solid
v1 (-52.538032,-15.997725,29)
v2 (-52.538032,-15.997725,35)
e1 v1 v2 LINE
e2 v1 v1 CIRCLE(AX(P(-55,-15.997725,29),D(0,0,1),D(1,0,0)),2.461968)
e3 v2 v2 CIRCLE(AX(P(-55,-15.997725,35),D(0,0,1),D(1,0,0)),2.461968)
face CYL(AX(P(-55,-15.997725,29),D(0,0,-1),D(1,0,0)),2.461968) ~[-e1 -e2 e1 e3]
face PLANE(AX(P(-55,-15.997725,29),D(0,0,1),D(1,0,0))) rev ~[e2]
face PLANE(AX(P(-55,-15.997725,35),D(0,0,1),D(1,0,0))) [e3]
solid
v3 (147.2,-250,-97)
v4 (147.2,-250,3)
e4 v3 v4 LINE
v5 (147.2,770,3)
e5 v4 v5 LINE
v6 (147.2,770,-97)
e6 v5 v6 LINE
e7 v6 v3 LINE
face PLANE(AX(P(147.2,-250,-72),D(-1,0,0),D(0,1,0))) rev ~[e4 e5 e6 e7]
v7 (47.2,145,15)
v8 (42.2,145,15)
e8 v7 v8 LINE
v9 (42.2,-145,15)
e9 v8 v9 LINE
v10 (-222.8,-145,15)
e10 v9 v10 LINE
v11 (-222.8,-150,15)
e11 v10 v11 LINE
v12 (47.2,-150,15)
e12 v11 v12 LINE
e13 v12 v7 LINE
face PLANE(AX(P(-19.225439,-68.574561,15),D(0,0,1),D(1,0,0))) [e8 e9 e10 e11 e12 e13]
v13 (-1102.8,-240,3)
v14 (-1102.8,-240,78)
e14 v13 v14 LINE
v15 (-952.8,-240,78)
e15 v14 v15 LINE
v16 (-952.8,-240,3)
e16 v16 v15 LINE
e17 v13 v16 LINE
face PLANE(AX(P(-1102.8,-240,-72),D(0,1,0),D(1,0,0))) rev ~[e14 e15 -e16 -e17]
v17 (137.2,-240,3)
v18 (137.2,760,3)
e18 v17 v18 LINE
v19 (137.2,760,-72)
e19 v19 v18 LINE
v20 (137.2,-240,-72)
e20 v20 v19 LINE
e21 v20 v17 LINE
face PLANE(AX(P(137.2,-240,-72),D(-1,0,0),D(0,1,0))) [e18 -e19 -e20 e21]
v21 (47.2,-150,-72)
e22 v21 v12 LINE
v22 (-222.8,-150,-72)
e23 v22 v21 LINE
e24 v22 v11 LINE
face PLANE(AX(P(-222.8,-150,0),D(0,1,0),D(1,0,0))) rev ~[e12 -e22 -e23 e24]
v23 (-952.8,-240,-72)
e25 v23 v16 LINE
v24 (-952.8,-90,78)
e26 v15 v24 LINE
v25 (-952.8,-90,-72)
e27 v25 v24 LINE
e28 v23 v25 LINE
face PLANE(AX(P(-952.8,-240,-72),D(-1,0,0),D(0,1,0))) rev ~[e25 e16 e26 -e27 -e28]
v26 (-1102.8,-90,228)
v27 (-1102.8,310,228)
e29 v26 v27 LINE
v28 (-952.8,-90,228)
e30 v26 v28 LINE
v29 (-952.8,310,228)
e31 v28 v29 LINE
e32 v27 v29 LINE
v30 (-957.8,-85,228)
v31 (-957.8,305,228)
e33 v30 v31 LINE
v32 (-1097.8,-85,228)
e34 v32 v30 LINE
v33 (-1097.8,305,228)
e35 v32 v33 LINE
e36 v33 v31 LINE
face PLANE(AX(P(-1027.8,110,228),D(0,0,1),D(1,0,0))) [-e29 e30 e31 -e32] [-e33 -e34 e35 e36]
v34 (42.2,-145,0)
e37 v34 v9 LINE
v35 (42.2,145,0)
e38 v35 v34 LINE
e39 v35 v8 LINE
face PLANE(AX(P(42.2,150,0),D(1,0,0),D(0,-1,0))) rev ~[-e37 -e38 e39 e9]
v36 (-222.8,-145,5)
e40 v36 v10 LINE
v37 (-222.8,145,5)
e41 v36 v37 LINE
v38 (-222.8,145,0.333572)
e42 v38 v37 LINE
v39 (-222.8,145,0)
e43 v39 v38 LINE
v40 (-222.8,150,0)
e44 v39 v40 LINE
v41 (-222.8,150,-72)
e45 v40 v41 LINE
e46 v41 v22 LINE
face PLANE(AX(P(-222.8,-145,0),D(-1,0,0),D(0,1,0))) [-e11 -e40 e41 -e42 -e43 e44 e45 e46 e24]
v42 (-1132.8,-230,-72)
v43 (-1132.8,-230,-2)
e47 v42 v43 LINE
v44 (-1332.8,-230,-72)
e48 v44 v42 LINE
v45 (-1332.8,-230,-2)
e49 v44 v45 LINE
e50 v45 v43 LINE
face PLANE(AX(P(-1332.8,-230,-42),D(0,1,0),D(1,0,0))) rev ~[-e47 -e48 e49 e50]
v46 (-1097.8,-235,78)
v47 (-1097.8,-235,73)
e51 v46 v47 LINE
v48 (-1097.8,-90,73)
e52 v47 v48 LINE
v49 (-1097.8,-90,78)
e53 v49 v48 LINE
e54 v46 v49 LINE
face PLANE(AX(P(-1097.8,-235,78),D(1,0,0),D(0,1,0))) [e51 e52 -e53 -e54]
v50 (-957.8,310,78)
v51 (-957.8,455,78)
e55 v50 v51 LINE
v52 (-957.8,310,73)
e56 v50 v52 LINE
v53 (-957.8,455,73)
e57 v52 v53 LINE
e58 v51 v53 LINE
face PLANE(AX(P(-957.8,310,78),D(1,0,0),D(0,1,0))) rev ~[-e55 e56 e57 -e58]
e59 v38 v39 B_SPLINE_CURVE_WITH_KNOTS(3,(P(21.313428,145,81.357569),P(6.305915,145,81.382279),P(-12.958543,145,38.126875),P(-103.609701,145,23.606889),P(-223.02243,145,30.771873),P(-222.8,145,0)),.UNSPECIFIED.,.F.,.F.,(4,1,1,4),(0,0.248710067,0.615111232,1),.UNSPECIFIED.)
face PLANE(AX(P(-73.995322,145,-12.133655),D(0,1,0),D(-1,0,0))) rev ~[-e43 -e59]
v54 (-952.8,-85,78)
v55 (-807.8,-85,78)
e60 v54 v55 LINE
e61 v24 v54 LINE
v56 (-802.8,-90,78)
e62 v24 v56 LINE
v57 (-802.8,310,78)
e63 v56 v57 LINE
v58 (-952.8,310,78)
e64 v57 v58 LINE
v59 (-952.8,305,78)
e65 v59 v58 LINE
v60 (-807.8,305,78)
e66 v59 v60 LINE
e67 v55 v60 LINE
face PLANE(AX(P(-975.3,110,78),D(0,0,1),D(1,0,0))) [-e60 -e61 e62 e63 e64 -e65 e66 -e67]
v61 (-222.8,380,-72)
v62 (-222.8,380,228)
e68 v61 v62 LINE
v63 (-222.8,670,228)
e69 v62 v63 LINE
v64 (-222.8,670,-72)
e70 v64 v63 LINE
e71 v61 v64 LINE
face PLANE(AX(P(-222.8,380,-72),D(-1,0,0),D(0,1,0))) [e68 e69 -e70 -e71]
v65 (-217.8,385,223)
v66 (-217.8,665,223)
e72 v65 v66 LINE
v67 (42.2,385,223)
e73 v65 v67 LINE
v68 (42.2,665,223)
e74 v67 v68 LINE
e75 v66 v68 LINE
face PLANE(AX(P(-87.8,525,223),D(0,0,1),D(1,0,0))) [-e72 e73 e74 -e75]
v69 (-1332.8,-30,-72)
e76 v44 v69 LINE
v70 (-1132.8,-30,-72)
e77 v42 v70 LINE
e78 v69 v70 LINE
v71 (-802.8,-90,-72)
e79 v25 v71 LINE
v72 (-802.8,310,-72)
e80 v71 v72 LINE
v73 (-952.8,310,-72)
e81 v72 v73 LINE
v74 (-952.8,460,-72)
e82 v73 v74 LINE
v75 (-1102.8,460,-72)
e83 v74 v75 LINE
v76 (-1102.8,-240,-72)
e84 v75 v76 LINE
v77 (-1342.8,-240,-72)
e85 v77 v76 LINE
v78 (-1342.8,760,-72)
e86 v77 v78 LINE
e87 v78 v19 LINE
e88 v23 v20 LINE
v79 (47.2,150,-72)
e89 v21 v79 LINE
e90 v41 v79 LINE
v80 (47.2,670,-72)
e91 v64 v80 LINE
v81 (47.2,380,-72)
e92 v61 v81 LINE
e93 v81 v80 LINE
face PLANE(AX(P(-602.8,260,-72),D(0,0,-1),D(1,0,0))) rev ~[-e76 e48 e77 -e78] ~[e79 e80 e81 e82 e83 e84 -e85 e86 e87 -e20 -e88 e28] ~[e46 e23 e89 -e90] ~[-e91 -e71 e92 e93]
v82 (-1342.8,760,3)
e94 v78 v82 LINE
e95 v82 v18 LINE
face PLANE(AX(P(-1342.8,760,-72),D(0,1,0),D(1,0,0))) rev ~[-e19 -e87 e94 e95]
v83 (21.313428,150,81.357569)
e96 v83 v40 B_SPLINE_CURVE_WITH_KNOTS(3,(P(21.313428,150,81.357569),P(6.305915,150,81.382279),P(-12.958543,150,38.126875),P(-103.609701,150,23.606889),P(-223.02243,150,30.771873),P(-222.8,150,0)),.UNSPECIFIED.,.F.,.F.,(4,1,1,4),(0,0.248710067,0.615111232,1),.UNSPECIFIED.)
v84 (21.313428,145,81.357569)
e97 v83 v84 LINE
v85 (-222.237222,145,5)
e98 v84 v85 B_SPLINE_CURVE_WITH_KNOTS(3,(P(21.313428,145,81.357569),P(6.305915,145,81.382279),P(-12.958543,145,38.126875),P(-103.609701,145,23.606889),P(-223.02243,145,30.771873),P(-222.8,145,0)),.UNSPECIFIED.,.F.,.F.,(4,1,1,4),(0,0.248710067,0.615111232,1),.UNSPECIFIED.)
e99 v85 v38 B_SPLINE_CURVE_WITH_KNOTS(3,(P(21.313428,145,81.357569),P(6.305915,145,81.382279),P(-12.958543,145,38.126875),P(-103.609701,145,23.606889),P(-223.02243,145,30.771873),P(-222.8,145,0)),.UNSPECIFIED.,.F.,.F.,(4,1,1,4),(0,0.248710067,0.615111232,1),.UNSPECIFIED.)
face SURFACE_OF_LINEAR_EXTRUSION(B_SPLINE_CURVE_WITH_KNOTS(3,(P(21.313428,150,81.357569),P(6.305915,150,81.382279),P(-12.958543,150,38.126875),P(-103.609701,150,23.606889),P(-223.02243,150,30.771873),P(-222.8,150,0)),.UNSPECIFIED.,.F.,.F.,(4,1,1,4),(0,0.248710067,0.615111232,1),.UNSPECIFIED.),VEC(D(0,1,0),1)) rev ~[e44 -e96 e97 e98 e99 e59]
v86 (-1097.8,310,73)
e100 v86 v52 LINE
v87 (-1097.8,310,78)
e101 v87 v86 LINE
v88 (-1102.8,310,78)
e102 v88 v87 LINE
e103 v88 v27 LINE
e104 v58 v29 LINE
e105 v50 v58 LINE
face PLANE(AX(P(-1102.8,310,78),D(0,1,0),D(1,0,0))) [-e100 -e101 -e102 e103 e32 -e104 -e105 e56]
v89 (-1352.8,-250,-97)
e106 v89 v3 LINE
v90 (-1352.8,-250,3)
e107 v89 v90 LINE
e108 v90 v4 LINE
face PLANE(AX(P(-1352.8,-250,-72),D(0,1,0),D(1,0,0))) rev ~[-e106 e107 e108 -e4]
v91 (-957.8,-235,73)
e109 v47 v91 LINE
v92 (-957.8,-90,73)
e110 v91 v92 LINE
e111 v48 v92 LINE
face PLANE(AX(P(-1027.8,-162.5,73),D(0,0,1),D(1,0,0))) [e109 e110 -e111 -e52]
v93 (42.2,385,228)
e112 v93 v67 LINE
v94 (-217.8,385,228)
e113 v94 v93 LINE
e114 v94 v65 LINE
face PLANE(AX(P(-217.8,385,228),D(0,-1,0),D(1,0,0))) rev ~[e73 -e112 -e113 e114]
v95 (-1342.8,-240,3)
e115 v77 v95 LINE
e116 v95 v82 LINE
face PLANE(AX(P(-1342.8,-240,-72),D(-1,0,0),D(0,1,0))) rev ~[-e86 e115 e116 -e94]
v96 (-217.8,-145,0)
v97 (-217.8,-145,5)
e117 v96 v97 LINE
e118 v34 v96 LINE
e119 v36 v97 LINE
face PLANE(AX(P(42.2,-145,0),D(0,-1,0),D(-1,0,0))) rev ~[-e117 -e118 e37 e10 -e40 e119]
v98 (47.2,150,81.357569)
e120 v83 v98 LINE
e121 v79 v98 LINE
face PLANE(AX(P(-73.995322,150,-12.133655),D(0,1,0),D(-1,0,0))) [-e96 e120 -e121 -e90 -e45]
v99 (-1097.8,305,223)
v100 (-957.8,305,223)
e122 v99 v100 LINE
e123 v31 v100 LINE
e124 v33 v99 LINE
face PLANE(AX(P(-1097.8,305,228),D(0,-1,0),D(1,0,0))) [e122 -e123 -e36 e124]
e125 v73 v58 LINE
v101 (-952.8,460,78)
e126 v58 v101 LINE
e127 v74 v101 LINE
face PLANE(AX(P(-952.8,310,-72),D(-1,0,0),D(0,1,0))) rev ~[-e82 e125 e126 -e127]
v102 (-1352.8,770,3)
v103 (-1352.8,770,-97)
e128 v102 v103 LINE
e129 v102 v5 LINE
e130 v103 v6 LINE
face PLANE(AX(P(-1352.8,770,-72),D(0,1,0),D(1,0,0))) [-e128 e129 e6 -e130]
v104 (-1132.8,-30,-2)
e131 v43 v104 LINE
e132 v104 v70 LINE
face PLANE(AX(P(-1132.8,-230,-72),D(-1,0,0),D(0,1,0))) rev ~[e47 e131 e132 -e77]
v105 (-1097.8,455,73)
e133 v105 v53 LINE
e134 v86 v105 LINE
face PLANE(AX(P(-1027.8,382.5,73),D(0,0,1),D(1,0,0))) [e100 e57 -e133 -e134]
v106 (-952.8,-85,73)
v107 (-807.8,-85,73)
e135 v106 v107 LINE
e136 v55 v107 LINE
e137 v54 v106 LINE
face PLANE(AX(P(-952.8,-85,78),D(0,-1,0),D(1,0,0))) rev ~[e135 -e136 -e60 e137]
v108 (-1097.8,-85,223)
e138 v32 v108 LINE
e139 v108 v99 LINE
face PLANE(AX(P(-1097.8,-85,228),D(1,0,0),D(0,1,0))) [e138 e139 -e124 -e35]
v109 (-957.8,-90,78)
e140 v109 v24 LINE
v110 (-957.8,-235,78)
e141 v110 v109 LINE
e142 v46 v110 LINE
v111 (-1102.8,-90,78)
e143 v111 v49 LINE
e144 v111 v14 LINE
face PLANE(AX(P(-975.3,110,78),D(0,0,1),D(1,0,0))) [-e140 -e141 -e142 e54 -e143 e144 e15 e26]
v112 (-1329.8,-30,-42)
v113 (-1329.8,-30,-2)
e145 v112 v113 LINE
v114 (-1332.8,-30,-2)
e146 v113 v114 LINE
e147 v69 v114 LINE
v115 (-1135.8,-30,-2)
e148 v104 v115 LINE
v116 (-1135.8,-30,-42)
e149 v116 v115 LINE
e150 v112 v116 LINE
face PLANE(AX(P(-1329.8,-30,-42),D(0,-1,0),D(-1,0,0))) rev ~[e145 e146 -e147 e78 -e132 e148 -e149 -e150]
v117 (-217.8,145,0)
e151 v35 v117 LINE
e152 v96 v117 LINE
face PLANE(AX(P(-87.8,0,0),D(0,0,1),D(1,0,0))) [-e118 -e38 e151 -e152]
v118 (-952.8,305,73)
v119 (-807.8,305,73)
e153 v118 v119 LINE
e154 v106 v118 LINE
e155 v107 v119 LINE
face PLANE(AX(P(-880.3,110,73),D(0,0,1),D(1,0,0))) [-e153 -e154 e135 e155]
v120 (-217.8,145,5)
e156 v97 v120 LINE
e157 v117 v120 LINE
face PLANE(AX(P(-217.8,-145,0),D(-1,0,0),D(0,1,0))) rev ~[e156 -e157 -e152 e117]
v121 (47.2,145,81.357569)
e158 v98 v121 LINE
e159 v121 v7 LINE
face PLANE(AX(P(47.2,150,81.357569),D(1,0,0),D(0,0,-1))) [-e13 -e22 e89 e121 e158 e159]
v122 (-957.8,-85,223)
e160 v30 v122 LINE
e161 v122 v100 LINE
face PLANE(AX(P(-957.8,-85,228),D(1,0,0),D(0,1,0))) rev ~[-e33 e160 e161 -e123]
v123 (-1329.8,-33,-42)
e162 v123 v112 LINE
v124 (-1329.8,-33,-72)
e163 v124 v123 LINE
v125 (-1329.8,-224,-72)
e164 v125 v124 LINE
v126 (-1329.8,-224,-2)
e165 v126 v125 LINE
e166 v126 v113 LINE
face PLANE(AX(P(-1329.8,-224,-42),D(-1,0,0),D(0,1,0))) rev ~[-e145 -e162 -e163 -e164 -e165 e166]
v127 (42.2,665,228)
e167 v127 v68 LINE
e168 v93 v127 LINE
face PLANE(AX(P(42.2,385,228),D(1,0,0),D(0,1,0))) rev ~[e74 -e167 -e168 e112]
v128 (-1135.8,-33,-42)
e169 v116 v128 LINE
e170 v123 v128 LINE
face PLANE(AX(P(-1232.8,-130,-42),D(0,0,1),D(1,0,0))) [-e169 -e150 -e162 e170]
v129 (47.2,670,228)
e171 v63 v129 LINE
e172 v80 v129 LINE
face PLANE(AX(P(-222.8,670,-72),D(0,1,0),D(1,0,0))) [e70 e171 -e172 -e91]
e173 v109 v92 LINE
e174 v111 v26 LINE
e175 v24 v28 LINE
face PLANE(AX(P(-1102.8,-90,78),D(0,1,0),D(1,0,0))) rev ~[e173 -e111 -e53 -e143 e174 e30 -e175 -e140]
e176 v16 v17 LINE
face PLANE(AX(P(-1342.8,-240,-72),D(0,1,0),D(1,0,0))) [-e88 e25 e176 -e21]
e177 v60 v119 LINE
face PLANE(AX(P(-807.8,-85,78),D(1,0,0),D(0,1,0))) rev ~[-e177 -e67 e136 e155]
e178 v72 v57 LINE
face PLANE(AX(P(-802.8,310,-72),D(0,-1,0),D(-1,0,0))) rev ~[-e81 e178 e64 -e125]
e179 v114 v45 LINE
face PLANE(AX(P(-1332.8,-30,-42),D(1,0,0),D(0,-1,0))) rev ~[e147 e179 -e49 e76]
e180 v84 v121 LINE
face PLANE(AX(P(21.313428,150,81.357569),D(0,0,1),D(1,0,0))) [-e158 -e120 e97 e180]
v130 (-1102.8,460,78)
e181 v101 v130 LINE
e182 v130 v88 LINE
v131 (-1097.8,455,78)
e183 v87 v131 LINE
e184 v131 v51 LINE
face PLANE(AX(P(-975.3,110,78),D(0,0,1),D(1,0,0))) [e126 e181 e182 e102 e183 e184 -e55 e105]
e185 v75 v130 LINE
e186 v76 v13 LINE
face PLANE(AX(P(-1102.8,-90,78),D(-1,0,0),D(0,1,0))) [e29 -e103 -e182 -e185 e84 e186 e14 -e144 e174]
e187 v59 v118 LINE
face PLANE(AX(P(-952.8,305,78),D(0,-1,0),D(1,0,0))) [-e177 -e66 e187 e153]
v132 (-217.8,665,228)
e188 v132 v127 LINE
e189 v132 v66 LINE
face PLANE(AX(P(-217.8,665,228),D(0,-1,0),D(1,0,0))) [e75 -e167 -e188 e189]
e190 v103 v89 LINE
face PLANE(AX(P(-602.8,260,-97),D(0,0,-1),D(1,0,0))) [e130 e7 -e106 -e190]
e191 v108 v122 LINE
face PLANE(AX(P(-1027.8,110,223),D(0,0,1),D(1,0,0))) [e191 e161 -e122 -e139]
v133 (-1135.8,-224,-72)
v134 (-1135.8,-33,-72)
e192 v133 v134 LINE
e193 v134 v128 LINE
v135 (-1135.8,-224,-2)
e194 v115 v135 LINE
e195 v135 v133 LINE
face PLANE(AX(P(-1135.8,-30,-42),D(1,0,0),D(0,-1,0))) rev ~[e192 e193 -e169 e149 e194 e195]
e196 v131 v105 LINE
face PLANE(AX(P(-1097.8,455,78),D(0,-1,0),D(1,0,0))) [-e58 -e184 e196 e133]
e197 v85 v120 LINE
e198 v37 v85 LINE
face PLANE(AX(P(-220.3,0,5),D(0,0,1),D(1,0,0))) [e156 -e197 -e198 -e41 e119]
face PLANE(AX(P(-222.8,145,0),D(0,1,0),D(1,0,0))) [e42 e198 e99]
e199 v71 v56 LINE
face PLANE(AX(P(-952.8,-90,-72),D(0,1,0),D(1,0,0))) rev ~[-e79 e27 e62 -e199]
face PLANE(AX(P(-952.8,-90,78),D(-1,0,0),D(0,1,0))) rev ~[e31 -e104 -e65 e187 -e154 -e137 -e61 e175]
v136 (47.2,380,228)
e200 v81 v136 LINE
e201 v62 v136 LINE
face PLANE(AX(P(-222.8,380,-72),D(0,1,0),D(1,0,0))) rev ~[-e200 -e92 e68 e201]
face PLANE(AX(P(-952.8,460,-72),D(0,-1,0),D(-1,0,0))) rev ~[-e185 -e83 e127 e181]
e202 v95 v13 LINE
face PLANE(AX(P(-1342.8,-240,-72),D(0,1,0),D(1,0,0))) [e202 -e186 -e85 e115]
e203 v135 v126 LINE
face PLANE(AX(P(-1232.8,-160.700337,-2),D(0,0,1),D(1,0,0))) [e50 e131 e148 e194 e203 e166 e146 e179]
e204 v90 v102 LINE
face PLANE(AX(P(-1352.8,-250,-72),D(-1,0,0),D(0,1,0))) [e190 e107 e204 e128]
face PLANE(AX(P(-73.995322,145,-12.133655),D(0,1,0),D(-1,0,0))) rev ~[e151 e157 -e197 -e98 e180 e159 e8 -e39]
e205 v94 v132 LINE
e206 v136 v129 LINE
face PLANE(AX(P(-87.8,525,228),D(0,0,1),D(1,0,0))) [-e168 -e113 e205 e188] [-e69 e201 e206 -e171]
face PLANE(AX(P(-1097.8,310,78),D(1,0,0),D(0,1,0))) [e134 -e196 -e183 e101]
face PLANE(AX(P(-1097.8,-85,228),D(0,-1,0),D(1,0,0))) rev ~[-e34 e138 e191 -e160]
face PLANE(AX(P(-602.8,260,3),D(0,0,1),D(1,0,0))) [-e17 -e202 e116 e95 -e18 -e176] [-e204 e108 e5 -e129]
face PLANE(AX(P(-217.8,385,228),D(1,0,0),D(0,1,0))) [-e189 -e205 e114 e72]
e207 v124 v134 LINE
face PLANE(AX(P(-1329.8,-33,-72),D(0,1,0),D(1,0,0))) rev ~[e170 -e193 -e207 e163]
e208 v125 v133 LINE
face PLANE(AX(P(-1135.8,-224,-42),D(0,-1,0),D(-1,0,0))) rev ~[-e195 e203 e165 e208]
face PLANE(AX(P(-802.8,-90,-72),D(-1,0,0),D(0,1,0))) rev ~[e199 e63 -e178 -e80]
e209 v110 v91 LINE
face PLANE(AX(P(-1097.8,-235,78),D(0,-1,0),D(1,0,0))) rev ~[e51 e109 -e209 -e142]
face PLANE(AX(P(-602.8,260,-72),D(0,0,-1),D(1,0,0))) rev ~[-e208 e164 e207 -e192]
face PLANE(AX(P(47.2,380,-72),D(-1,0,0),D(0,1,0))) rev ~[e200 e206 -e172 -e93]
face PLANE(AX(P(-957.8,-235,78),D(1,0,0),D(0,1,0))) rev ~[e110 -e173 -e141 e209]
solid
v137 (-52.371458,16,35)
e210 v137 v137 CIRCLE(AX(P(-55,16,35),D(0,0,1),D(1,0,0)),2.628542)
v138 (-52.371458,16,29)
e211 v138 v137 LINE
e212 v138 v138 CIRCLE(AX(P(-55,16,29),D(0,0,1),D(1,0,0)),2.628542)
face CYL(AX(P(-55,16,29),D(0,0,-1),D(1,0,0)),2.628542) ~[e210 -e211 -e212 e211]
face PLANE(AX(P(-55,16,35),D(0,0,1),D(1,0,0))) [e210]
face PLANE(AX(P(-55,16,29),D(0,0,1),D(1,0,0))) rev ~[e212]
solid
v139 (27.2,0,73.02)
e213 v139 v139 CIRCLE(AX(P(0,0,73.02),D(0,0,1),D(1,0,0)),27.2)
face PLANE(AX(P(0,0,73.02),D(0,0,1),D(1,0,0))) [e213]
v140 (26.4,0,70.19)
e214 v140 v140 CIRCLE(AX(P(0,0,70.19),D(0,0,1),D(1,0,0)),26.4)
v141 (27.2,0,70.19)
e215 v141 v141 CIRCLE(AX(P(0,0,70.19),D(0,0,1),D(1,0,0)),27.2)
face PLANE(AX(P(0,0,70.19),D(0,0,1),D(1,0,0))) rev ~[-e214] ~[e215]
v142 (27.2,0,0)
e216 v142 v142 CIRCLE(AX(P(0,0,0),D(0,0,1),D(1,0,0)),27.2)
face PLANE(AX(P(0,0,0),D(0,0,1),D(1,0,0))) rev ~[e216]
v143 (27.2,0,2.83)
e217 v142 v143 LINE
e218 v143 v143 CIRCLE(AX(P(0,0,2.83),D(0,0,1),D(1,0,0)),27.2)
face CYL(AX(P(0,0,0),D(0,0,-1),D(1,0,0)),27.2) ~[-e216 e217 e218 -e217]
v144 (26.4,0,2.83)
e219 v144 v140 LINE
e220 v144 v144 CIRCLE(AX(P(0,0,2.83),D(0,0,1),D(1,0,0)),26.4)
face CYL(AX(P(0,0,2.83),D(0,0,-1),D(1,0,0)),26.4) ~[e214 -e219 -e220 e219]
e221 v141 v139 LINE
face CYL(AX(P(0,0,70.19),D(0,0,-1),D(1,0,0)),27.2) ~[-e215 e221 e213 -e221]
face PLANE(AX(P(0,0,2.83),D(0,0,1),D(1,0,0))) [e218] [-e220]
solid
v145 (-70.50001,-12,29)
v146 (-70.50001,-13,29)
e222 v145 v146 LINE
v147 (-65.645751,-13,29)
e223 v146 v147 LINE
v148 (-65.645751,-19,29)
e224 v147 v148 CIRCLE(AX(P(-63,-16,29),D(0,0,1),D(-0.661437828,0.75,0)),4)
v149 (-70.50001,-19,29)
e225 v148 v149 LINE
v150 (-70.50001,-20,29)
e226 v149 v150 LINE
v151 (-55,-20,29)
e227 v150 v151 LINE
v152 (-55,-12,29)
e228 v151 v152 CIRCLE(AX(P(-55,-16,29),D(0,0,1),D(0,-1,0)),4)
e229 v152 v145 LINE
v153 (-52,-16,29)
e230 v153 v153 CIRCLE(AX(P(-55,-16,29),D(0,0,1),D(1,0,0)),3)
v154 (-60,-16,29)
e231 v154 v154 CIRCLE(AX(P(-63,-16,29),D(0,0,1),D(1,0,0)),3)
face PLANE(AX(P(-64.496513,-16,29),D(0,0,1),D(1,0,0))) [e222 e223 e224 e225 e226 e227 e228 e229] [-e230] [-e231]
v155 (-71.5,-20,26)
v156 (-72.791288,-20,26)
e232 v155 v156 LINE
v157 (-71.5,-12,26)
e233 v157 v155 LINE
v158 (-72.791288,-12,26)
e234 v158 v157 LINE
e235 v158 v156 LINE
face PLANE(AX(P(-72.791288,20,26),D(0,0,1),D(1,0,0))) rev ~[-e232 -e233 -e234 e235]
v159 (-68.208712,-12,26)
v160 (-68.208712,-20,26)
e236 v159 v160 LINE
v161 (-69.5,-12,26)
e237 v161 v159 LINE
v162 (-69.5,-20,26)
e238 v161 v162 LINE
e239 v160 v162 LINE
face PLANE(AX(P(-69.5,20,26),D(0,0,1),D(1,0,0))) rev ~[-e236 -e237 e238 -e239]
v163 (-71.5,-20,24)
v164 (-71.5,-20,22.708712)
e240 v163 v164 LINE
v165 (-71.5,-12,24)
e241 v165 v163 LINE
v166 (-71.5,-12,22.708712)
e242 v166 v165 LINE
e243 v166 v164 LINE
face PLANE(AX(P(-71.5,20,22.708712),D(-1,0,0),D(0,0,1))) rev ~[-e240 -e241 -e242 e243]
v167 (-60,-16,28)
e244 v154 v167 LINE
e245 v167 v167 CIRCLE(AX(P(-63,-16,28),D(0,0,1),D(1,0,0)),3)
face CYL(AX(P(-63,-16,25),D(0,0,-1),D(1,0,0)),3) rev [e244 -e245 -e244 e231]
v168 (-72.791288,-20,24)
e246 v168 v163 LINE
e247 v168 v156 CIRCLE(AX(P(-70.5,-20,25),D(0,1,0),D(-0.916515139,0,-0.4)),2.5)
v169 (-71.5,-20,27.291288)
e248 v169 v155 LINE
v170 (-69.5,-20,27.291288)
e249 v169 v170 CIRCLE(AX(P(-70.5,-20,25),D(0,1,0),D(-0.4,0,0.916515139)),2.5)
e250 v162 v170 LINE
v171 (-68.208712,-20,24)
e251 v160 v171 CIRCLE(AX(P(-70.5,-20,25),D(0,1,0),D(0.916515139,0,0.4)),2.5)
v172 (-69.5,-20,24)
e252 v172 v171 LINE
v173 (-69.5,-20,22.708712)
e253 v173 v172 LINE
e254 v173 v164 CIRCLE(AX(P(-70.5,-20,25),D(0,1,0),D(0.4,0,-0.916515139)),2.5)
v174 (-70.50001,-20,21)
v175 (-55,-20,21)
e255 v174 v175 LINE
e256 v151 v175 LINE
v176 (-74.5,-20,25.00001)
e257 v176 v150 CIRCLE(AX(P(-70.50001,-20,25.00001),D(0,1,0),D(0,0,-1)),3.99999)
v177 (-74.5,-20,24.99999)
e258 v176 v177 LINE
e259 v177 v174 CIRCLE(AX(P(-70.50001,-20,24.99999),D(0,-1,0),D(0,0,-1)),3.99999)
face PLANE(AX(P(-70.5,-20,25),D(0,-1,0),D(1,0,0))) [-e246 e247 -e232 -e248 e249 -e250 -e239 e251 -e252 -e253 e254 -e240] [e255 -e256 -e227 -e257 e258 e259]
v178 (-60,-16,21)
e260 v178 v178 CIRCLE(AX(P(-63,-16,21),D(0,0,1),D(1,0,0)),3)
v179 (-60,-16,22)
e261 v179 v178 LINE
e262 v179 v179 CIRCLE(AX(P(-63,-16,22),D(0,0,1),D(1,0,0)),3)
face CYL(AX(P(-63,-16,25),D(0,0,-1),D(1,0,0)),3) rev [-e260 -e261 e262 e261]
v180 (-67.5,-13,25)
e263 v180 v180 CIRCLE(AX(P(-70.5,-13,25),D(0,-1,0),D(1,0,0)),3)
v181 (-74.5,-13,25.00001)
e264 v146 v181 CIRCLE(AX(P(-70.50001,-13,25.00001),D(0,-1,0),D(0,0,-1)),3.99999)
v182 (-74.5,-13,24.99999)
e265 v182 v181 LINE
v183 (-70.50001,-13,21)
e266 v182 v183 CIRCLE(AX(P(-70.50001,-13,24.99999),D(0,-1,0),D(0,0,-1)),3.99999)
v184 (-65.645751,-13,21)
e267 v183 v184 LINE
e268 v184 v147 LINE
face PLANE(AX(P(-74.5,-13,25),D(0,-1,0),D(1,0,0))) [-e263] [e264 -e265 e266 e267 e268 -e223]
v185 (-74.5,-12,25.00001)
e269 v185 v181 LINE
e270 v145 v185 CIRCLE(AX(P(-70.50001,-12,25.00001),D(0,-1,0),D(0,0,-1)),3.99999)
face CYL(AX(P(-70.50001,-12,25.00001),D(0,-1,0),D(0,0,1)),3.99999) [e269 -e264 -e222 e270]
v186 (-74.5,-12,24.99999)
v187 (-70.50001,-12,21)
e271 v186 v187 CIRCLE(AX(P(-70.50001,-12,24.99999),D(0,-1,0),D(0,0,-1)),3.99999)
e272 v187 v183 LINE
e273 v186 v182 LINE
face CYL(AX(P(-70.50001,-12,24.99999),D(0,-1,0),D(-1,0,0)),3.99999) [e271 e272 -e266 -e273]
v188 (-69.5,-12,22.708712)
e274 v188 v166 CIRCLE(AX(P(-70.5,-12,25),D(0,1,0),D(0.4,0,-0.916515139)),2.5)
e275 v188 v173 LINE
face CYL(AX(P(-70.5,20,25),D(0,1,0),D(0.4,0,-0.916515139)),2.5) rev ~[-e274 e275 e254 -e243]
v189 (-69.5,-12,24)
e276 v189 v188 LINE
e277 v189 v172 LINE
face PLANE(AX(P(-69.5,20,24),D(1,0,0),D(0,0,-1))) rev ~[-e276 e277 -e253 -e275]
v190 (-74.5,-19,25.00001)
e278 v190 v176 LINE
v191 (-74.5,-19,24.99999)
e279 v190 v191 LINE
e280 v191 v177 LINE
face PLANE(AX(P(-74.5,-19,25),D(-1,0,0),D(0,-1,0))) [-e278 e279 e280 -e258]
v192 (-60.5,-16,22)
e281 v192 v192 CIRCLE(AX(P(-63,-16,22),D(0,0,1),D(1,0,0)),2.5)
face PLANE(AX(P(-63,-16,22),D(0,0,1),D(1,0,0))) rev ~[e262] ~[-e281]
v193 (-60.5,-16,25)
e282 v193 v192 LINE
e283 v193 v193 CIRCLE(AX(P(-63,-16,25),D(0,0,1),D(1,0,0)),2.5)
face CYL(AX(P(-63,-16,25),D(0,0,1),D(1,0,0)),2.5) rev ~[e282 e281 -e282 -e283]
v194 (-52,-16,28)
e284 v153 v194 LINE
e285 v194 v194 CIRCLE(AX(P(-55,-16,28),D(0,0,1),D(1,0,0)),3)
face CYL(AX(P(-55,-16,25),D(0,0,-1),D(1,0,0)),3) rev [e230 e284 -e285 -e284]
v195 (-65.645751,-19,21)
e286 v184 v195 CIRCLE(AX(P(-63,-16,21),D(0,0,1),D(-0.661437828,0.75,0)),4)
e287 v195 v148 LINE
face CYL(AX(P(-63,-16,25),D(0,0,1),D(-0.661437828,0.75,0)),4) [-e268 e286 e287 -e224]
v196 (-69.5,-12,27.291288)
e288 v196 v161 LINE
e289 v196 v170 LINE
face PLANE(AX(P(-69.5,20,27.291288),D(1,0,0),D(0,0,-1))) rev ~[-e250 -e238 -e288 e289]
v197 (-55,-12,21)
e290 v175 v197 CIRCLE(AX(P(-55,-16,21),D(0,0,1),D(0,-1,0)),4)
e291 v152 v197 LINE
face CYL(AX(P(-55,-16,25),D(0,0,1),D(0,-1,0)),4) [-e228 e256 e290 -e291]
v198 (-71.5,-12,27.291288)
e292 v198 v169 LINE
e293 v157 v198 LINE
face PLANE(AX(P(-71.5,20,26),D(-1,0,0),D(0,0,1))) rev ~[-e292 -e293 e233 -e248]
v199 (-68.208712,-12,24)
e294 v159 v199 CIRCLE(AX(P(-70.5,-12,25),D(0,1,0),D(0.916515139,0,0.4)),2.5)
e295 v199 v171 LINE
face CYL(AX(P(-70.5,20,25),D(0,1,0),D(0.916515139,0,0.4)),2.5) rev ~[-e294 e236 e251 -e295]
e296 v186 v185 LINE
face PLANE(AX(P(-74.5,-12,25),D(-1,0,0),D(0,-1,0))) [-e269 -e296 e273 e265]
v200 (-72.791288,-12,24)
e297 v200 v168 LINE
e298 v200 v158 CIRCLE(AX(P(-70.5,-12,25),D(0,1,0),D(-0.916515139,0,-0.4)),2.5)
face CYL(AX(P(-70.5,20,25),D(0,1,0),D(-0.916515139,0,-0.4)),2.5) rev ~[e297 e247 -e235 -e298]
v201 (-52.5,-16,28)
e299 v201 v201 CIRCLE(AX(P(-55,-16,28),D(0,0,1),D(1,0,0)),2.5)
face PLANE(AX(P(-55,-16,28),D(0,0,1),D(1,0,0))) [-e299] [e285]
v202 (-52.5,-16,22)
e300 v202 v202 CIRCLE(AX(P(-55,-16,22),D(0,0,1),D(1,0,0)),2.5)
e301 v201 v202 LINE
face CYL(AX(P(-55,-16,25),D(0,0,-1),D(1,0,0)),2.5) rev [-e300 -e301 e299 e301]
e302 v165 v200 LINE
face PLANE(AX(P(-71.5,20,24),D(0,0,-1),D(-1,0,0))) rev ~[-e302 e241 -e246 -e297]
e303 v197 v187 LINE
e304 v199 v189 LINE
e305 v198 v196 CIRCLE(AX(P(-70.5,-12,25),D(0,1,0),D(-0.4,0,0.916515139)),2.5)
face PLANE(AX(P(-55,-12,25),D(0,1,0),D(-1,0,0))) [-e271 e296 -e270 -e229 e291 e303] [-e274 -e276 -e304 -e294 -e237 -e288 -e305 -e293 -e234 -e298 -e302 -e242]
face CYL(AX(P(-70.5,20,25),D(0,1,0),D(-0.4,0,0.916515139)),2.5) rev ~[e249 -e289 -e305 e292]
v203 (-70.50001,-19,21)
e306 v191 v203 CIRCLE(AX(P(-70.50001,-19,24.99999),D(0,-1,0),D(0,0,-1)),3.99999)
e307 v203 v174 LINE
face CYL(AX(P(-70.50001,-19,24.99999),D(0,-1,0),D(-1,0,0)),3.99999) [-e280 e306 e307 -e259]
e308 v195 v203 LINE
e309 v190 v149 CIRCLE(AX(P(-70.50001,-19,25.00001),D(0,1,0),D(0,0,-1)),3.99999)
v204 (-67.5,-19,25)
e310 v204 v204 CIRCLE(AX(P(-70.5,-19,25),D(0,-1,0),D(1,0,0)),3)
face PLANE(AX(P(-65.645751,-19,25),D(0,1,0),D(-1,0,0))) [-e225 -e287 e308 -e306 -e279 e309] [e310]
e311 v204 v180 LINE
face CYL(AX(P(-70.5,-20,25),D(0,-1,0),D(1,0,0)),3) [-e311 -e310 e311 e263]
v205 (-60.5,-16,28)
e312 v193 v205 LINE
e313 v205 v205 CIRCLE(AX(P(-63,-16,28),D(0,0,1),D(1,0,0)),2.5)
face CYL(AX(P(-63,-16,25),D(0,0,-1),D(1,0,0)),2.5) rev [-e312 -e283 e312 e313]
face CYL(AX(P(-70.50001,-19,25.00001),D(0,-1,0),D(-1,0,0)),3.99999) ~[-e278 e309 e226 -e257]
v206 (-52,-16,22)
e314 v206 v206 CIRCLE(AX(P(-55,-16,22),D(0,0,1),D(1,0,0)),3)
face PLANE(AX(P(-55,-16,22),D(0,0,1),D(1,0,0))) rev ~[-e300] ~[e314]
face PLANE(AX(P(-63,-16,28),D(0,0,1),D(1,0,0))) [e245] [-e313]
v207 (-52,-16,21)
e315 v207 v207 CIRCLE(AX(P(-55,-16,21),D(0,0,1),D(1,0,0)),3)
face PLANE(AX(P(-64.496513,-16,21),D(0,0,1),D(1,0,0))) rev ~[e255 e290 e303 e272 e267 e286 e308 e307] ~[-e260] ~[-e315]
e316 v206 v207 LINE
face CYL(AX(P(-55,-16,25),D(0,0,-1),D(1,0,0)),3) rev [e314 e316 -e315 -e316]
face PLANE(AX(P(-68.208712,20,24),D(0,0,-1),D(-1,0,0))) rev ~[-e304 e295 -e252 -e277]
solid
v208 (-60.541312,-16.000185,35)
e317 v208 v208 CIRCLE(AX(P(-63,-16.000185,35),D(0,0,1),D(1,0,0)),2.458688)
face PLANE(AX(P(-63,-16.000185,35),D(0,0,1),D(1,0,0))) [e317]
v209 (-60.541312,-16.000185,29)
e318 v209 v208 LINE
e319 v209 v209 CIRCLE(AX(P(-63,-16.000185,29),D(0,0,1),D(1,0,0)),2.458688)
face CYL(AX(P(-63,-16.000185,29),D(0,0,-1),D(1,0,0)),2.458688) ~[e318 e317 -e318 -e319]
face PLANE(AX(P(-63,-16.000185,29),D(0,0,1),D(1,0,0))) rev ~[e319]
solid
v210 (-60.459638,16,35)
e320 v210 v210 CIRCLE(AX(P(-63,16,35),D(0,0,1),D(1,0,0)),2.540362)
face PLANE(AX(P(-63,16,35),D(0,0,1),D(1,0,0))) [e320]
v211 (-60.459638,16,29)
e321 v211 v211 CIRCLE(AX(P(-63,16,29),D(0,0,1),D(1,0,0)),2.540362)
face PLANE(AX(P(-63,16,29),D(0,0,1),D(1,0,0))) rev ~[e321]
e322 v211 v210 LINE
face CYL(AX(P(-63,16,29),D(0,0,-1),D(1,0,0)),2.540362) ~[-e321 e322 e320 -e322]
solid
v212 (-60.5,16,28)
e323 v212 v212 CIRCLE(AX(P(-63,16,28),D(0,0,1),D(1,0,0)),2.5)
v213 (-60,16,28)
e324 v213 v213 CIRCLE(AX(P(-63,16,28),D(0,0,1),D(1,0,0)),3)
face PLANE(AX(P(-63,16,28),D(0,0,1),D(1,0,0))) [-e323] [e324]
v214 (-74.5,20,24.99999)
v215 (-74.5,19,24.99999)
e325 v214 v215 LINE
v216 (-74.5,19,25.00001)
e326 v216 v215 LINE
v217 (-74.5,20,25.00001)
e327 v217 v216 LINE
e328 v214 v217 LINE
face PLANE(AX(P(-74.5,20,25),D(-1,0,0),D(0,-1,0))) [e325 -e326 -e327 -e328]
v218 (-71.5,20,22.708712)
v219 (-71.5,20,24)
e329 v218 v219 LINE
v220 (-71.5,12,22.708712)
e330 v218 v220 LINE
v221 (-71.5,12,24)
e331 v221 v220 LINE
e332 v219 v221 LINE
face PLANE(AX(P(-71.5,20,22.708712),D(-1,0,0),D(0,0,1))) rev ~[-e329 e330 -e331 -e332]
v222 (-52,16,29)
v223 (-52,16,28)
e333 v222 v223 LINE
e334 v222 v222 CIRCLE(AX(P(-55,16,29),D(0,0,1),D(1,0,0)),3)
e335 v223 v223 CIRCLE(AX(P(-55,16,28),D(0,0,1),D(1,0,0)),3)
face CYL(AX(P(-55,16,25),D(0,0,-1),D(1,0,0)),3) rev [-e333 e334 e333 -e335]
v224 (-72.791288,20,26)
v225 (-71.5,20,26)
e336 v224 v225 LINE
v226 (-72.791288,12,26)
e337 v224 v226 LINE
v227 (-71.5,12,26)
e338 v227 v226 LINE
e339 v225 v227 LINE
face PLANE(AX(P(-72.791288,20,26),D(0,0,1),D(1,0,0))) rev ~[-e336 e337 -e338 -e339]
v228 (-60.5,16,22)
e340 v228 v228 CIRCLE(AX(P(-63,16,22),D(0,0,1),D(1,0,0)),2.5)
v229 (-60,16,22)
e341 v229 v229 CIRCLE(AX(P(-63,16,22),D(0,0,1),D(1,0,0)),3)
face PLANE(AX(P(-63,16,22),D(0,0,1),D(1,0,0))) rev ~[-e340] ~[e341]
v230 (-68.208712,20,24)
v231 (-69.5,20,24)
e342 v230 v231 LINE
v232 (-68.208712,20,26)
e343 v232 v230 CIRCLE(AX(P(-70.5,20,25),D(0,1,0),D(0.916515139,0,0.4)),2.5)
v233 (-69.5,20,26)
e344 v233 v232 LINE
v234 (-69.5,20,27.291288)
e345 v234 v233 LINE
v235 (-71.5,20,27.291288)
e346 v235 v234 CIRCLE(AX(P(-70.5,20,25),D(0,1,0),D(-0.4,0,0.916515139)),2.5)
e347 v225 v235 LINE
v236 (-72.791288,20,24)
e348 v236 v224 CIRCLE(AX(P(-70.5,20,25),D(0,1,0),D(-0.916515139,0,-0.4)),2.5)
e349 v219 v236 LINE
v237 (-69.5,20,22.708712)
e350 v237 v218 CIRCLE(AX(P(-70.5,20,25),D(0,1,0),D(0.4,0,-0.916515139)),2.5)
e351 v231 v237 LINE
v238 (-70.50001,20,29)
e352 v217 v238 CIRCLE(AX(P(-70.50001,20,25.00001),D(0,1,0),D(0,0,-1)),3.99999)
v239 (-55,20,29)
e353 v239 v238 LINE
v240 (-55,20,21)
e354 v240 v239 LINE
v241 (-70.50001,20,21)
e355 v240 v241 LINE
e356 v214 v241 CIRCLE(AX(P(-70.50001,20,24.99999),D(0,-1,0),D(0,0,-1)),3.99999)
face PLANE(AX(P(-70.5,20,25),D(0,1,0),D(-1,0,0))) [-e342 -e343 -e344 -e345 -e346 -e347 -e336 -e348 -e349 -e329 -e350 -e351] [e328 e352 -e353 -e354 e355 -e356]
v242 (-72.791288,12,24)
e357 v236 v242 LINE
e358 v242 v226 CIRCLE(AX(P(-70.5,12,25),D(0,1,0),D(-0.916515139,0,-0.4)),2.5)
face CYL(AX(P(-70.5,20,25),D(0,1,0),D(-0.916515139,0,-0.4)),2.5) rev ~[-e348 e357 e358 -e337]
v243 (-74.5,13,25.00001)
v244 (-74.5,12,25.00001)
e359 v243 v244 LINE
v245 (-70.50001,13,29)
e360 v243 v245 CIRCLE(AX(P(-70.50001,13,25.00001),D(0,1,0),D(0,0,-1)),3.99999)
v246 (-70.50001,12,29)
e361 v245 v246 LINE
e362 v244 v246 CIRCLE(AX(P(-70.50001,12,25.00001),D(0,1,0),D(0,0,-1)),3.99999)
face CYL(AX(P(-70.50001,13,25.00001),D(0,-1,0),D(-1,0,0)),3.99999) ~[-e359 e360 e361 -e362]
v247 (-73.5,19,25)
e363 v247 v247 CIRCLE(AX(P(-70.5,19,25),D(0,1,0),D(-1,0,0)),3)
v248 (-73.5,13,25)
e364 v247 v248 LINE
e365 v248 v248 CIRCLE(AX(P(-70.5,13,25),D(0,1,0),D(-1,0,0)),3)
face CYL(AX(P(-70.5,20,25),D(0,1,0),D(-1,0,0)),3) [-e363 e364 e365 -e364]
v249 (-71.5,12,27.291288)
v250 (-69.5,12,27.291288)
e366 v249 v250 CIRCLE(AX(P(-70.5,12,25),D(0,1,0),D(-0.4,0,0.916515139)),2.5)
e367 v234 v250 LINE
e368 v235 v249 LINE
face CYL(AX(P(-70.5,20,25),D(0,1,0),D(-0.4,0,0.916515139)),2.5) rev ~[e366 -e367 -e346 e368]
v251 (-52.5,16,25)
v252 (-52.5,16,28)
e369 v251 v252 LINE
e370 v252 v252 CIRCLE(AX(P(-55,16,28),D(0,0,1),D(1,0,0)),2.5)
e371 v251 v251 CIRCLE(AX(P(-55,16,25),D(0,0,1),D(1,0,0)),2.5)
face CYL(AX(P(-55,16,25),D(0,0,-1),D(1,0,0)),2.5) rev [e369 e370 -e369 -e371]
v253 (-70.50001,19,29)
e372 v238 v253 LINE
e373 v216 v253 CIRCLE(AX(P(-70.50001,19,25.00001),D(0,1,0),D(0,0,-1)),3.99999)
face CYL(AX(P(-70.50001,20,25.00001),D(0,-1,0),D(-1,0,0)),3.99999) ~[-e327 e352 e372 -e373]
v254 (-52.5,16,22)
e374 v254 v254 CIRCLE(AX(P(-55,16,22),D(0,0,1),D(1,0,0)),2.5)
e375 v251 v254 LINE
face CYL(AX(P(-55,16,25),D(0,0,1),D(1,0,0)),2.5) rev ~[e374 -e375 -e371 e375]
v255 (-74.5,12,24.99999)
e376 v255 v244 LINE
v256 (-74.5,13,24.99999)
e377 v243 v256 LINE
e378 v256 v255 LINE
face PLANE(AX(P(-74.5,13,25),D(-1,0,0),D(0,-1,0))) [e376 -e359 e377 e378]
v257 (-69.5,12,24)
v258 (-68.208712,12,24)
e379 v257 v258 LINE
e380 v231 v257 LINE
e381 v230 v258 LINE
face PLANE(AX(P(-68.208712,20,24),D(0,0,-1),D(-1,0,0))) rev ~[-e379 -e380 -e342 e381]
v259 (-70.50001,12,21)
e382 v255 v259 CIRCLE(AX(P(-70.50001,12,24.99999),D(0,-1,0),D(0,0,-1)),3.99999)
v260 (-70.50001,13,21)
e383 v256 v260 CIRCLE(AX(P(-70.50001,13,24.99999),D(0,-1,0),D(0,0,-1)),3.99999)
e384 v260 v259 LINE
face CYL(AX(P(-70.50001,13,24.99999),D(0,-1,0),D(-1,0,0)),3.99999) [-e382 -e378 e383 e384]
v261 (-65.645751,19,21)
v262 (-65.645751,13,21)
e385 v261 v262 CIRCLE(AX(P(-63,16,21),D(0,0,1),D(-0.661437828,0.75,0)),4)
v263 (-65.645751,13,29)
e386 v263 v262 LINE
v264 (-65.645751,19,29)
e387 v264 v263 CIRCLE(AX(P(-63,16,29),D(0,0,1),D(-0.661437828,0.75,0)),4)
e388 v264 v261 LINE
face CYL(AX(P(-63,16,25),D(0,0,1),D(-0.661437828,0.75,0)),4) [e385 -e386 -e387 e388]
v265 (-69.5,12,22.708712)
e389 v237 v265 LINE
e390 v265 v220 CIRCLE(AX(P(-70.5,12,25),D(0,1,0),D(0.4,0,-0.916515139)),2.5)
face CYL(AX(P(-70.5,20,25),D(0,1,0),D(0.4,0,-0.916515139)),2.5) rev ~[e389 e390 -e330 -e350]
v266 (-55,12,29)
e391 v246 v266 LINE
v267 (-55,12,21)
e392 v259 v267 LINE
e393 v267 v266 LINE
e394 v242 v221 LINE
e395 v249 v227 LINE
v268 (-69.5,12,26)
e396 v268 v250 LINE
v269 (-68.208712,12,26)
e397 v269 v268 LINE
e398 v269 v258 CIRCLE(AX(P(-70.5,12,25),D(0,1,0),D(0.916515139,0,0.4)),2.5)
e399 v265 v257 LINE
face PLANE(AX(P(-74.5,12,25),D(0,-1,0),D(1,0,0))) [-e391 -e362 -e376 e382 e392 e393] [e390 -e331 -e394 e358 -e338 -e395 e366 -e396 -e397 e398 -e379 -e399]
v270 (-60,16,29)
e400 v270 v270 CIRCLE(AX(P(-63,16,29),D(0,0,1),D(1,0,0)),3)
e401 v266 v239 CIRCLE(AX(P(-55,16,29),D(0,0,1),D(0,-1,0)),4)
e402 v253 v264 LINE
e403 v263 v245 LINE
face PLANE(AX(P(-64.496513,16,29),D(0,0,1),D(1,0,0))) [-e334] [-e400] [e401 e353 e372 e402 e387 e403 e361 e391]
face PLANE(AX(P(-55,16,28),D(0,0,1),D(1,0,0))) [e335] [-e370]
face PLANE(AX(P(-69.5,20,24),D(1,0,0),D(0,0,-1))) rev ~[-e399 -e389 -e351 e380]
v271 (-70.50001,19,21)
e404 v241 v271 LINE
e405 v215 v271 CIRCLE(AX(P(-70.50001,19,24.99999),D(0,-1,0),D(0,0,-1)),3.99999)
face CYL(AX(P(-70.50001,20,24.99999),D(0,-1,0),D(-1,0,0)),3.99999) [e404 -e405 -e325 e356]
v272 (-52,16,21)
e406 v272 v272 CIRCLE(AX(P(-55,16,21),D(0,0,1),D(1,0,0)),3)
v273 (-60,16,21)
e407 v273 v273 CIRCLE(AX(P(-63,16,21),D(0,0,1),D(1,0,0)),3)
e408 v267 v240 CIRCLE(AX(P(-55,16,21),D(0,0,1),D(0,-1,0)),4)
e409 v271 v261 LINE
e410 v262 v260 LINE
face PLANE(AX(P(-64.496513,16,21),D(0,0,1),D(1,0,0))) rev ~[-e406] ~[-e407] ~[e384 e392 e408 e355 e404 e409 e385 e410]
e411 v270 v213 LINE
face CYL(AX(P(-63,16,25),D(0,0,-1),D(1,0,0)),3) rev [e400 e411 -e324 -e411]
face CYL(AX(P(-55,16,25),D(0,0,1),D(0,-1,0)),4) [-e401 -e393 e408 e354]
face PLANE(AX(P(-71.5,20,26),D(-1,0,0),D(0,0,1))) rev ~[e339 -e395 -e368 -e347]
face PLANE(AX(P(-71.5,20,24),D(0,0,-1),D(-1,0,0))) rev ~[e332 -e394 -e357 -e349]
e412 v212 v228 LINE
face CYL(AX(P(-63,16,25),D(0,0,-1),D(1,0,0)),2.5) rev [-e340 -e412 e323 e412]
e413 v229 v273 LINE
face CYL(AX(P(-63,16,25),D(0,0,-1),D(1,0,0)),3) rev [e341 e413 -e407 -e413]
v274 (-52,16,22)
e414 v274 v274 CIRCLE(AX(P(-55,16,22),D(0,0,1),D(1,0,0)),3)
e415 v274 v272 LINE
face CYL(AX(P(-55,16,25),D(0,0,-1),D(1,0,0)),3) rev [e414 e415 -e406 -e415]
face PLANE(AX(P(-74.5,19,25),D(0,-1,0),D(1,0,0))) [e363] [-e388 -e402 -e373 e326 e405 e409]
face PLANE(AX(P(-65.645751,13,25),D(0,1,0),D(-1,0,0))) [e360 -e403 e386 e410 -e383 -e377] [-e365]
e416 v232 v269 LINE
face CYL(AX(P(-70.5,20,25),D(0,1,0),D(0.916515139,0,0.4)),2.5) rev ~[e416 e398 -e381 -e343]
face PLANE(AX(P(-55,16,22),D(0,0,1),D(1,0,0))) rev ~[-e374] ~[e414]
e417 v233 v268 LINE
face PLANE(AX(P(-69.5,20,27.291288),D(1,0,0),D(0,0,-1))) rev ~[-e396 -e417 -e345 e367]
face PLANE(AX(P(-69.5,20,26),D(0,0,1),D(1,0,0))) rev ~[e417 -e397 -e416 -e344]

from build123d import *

# Parameters (mm, degrees)
F0_R      = 27.2
F1_DEPTH  = 2.83
F2_R      = 26.4
F3_DEPTH  = 67.36
F4_R      = 27.2
F5_DEPTH  = 2.83
F9_W      = 270
F9_H      = 300
F10_DEPTH = 72
F12_DEPTH = 15
F14_DEPTH = 5
F15_W     = 5
F15_H     = 290
F16_DEPTH = 5
F17_W     = 1500
F17_H     = 1020
F18_DEPTH = 25
F19_W     = 270
F19_H     = 290
F20_DEPTH = 300
F21_W     = 260
F21_H     = 280
F22_DEPTH = 5
F23_W     = 1500
F23_H     = 1020
F23_W_2   = 1480
F23_H_2   = 1000
F24_DEPTH = 75
F26_DEPTH = 150
F27_W     = 150
F27_H     = 400
F28_DEPTH = 150
F29_W     = 140
F29_H     = 390
F30_DEPTH = 5
F31_W     = 140
F31_H     = 145
F31_W_2   = 145
F31_H_2   = 390
F32_DEPTH = 5
F33_R     = 3
F34_DEPTH = 4
F35_R     = 3.99999
F35_2_R   = 3.99999
F36_R     = 3
F37_DEPTH = 8
F38_R     = 3
F39_DEPTH = 8
F40_R     = 3
F40_R_2   = 2.5
F41_DEPTH = 3
F42_R     = 3
F42_R_2   = 2.5
F43_DEPTH = 3
F45_DEPTH = 270.001
F46_W     = 200
F46_H     = 200
F46_W_2   = 194
F46_H_2   = 191
F47_DEPTH = 30
F49_DEPTH = 40
F50_R     = 2.5403619878
F51_DEPTH = 6
F50_R_2   = 2.6285420135
F50_R_3   = 2.461967709
F50_R_4   = 2.4586880428


# Not quite as in the source:
# - a fillet or chamfer is up to 0.001 mm smaller than in the source, because OpenCascade refuses the exact size
# - a feature names something its author has since deleted; it is built from what else it names


with BuildPart() as f1:
    # F0 (on Top) → F1 (new body)
    with BuildSketch(Plane.XY):
        Circle(F0_R)
    extrude(amount=F1_DEPTH)

    # F2 (on face) → F3 (join)
    with BuildSketch(Plane.XY.offset(2.83)):
        Circle(F2_R)
    extrude(amount=F3_DEPTH)

    # F4 (on face) → F5 (join)
    with BuildSketch(Plane.XY.offset(70.19)):
        Circle(F4_R)
    extrude(amount=F5_DEPTH)


with BuildPart() as f10:
    # F9 (on Top) → F10 (new body)
    with BuildSketch(Plane.XY):
        with Locations((-87.8, 0)):
            Rectangle(F9_W, F9_H)
    extrude(amount=-F10_DEPTH)

    # F11 (on face) → F12 (join)
    with BuildSketch(Plane.XY):
        Polygon((-222.8, -145), (-222.8, -150), (47.2, -150), (47.2, 150), (42.2, 150), (42.2, -145), align=None)
    extrude(amount=F12_DEPTH)

    # F13 (on face) → F14 (join)
    with BuildSketch(Plane(origin=(0, 150, 0), x_dir=(-1, 0, 0), z_dir=(0, 1, 0))):
        with BuildLine():
            Line((-21.3134280931, 81.3575685024), (-47.2, 81.3575685024))
            Line((-47.2, 81.3575685024), (-47.2, -72))
            Line((-47.2, -72), (222.8, -72))
            Line((222.8, -72), (222.8, 0))
            add(Edge.make_bspline(
                [(-21.3134280931, 81.3575685024), (-6.3059147253, 81.3822787863), (12.9585432644, 38.1268753575), (103.6097013063, 23.6068887567), (223.0224295336, 30.7718731823), (222.8, 0)],
                knots=[0, 0, 0, 0, 0.2487100673, 0.6151112321, 1, 1, 1, 1], degree=3))
        make_face()
    extrude(amount=-F14_DEPTH)

    # F15 (on face) → F16 (join)
    with BuildSketch(Plane.XY):
        with Locations((-220.3, 0)):
            Rectangle(F15_W, F15_H)
    extrude(amount=F16_DEPTH)

    # F17 (on face) → F18 (join)
    with BuildSketch(Plane(origin=(0, 0, -72), x_dir=(1, 0, 0), z_dir=(0, 0, -1))):
        with Locations((-602.8, -260)):
            Rectangle(F17_W, F17_H)
    extrude(amount=F18_DEPTH)

    # F19 (on face) → F20 (join)
    with BuildSketch(Plane.XY.offset(-72)):
        with Locations((-87.8, 525)):
            Rectangle(F19_W, F19_H)
    extrude(amount=F20_DEPTH)

    # F21 (on face) → F22 (cut)
    with BuildSketch(Plane.XY.offset(228)):
        with Locations((-87.8, 525)):
            Rectangle(F21_W, F21_H)
    extrude(amount=-F22_DEPTH, mode=Mode.SUBTRACT)

    # F23 (on face) → F24 (join)
    with BuildSketch(Plane.XY.offset(-72)):
        with Locations((-602.8, 260)):
            Rectangle(F23_W, F23_H)
        with Locations((-602.8, 260)):
            Rectangle(F23_W_2, F23_H_2, mode=Mode.SUBTRACT)
    extrude(amount=F24_DEPTH)

    # F25 (on face) → F26 (join)
    with BuildSketch(Plane.XY.offset(-72)):
        Polygon((-952.8, 460), (-1102.8, 460), (-1102.8, -240), (-952.8, -240), (-952.8, -90), (-802.8, -90), (-802.8, 310), (-952.8, 310), align=None)
    extrude(amount=F26_DEPTH)

    # F27 (on face) → F28 (join)
    with BuildSketch(Plane.XY.offset(78)):
        with Locations((-1027.8, 110)):
            Rectangle(F27_W, F27_H)
    extrude(amount=F28_DEPTH)

    # F29 (on face) → F30 (cut)
    with BuildSketch(Plane.XY.offset(228)):
        with Locations((-1027.8, 110)):
            Rectangle(F29_W, F29_H)
    extrude(amount=-F30_DEPTH, mode=Mode.SUBTRACT)

    # F31 (on face) → F32 (cut)
    with BuildSketch(Plane.XY.offset(78)):
        with Locations((-1027.8, 382.5)):
            Rectangle(F31_W, F31_H)
        with Locations((-880.3, 110)):
            Rectangle(F31_W_2, F31_H_2)
        with Locations((-1027.8, -162.5)):
            Rectangle(F31_W, F31_H)
    extrude(amount=-F32_DEPTH, mode=Mode.SUBTRACT)

    # F46 (on face) → F47 (join)
    with BuildSketch(Plane.XY.offset(-72)):
        with Locations((-1232.8, -130)):
            Rectangle(F46_W, F46_H)
        with Locations((-1232.8, -128.5)):
            Rectangle(F46_W_2, F46_H_2, mode=Mode.SUBTRACT)
    extrude(amount=F47_DEPTH)

    # F48 (on face) → F49 (join)
    with BuildSketch(Plane.XY.offset(-42)):
        Polygon((-1329.8, -30), (-1332.8, -30), (-1332.8, -230), (-1329.8, -230), (-1135.8, -230), (-1132.8, -230), (-1132.8, -30), (-1135.8, -30), (-1135.8, -224), (-1329.8, -224), align=None)
    extrude(amount=F49_DEPTH)


with BuildPart() as f34:
    # F33 (on offset) → F34 (new body, symmetric)
    with BuildSketch(Plane.XY.offset(25)):
        with BuildLine():
            Line((-55, -12), (-74.5, -12))
            Line((-74.5, -12), (-74.5, -13))
            Line((-74.5, -13), (-65.6457513111, -13))
            ThreePointArc((-65.6457513111, -13), (-67, -16), (-65.6457513111, -19))
            Line((-65.6457513111, -19), (-74.5, -19))
            Line((-74.5, -19), (-74.5, -20))
            Line((-74.5, -20), (-55, -20))
            ThreePointArc((-55, -20), (-51, -16), (-55, -12))
        make_face()
        with Locations((-63, -16)):
            Circle(F33_R, mode=Mode.SUBTRACT)
        with Locations((-55, -16)):
            Circle(F33_R, mode=Mode.SUBTRACT)
    extrude(amount=F34_DEPTH, both=True)

    # F35 (radius 4 in the source; OpenCascade refuses exactly that, so slightly less here)
    f35_edges = [f34.edges().sort_by_distance(p)[0] for p in [
        (-74.5, -19.5, 29),
        (-74.5, -12.5, 29),
        (-74.5, -19.5, 21),
        (-74.5, -12.5, 21),
    ]]
    fillet(f35_edges, radius=F35_R)

    # F36 (on face) → F37 (join, through all)
    with BuildSketch(Plane.XZ.offset(20)):
        with Locations((-70.5, 25)):
            Circle(F36_R)
    extrude(amount=-F37_DEPTH)

    # F42 (on offset) → F43 (join, symmetric)
    with BuildSketch(Plane.XY.offset(25)):
        with Locations((-63, -16)):
            Circle(F42_R)
        with Locations((-63, -16)):
            Circle(F42_R_2, mode=Mode.SUBTRACT)
        with Locations((-55, -16)):
            Circle(F42_R)
        with Locations((-55, -16)):
            Circle(F42_R_2, mode=Mode.SUBTRACT)
    extrude(amount=F43_DEPTH, both=True)


with BuildPart() as f34b:
    # F33 (on offset) → F34, piece 2 (new body, symmetric)
    with BuildSketch(Plane.XY.offset(25)):
        with BuildLine():
            Line((-74.5, 13), (-74.5, 12))
            Line((-74.5, 12), (-55, 12))
            ThreePointArc((-55, 12), (-51, 16), (-55, 20))
            Line((-55, 20), (-74.5, 20))
            Line((-74.5, 20), (-74.5, 19))
            Line((-74.5, 19), (-65.6457513111, 19))
            ThreePointArc((-65.6457513111, 19), (-67, 16), (-65.6457513111, 13))
            Line((-65.6457513111, 13), (-74.5, 13))
        make_face()
        with Locations((-63, 16)):
            Circle(F33_R, mode=Mode.SUBTRACT)
        with Locations((-55, 16)):
            Circle(F33_R, mode=Mode.SUBTRACT)
    extrude(amount=F34_DEPTH, both=True)

    # F35#2 (radius 4 in the source; OpenCascade refuses exactly that, so slightly less here)
    f35_2_edges = [f34b.edges().sort_by_distance(p)[0] for p in [
        (-74.5, 12.5, 29),
        (-74.5, 19.5, 29),
        (-74.5, 19.5, 21),
        (-74.5, 12.5, 21),
    ]]
    fillet(f35_2_edges, radius=F35_2_R)

    # F38 (on face) → F39 (join, through all)
    with BuildSketch(Plane(origin=(0, 20, 0), x_dir=(-1, 0, 0), z_dir=(0, 1, 0))):
        with Locations((70.5, 25)):
            Circle(F38_R)
    extrude(amount=-F39_DEPTH)

    # F40 (on offset) → F41 (join, symmetric)
    with BuildSketch(Plane.XY.offset(25)):
        with Locations((-55, 16)):
            Circle(F40_R)
        with Locations((-55, 16)):
            Circle(F40_R_2, mode=Mode.SUBTRACT)
        with Locations((-63, 16)):
            Circle(F40_R)
        with Locations((-63, 16)):
            Circle(F40_R_2, mode=Mode.SUBTRACT)
    extrude(amount=F41_DEPTH, both=True)


with BuildPart() as f45_tool:
    # F44 (on face) → F45 (new body, through all)
    with BuildSketch(Plane(origin=(0, 20, 0), x_dir=(-1, 0, 0), z_dir=(0, 1, 0))):
        with BuildLine():
            Line((71.5, 26), (71.5, 27.2912878475))
            ThreePointArc((71.5, 27.2912878475), (70.5, 27.5), (69.5, 27.2912878475))
            Line((69.5, 27.2912878475), (69.5, 26))
            Line((69.5, 26), (68.2087121525, 26))
            ThreePointArc((68.2087121525, 26), (68, 25), (68.2087121525, 24))
            Line((68.2087121525, 24), (69.5, 24))
            Line((69.5, 24), (69.5, 22.7087121525))
            ThreePointArc((69.5, 22.7087121525), (70.5, 22.5), (71.5, 22.7087121525))
            Line((71.5, 22.7087121525), (71.5, 24))
            Line((71.5, 24), (72.7912878475, 24))
            ThreePointArc((72.7912878475, 24), (73, 25), (72.7912878475, 26))
            Line((72.7912878475, 26), (71.5, 26))
        make_face()
    extrude(amount=-F45_DEPTH)


with BuildPart() as f34_1:
    add(f34.part)

    # F45: cut by f45_tool
    add(f45_tool.part, mode=Mode.SUBTRACT)


with BuildPart() as f34b_1:
    add(f34b.part)

    # F45: cut by f45_tool
    add(f45_tool.part, mode=Mode.SUBTRACT)


with BuildPart() as f51:
    # F50 (on face) → F51 (new body)
    with BuildSketch(Plane.XY.offset(29)):
        with Locations((-63, 16)):
            Circle(F50_R)
    extrude(amount=F51_DEPTH)


with BuildPart() as f51b:
    # F50 (on face) → F51, piece 2 (new body)
    with BuildSketch(Plane.XY.offset(29)):
        with Locations((-55, 16)):
            Circle(F50_R_2)
    extrude(amount=F51_DEPTH)


with BuildPart() as f51c:
    # F50 (on face) → F51, piece 3 (new body)
    with BuildSketch(Plane.XY.offset(29)):
        with Locations((-55, -15.9977246076)):
            Circle(F50_R_3)
    extrude(amount=F51_DEPTH)


with BuildPart() as f51d:
    # F50 (on face) → F51, piece 4 (new body)
    with BuildSketch(Plane.XY.offset(29)):
        with Locations((-63, -16.0001851618)):
            Circle(F50_R_4)
    extrude(amount=F51_DEPTH)


solid = Compound([f1.part, f10.part, f34_1.part, f34b_1.part, f51.part, f51b.part, f51c.part, f51d.part])
